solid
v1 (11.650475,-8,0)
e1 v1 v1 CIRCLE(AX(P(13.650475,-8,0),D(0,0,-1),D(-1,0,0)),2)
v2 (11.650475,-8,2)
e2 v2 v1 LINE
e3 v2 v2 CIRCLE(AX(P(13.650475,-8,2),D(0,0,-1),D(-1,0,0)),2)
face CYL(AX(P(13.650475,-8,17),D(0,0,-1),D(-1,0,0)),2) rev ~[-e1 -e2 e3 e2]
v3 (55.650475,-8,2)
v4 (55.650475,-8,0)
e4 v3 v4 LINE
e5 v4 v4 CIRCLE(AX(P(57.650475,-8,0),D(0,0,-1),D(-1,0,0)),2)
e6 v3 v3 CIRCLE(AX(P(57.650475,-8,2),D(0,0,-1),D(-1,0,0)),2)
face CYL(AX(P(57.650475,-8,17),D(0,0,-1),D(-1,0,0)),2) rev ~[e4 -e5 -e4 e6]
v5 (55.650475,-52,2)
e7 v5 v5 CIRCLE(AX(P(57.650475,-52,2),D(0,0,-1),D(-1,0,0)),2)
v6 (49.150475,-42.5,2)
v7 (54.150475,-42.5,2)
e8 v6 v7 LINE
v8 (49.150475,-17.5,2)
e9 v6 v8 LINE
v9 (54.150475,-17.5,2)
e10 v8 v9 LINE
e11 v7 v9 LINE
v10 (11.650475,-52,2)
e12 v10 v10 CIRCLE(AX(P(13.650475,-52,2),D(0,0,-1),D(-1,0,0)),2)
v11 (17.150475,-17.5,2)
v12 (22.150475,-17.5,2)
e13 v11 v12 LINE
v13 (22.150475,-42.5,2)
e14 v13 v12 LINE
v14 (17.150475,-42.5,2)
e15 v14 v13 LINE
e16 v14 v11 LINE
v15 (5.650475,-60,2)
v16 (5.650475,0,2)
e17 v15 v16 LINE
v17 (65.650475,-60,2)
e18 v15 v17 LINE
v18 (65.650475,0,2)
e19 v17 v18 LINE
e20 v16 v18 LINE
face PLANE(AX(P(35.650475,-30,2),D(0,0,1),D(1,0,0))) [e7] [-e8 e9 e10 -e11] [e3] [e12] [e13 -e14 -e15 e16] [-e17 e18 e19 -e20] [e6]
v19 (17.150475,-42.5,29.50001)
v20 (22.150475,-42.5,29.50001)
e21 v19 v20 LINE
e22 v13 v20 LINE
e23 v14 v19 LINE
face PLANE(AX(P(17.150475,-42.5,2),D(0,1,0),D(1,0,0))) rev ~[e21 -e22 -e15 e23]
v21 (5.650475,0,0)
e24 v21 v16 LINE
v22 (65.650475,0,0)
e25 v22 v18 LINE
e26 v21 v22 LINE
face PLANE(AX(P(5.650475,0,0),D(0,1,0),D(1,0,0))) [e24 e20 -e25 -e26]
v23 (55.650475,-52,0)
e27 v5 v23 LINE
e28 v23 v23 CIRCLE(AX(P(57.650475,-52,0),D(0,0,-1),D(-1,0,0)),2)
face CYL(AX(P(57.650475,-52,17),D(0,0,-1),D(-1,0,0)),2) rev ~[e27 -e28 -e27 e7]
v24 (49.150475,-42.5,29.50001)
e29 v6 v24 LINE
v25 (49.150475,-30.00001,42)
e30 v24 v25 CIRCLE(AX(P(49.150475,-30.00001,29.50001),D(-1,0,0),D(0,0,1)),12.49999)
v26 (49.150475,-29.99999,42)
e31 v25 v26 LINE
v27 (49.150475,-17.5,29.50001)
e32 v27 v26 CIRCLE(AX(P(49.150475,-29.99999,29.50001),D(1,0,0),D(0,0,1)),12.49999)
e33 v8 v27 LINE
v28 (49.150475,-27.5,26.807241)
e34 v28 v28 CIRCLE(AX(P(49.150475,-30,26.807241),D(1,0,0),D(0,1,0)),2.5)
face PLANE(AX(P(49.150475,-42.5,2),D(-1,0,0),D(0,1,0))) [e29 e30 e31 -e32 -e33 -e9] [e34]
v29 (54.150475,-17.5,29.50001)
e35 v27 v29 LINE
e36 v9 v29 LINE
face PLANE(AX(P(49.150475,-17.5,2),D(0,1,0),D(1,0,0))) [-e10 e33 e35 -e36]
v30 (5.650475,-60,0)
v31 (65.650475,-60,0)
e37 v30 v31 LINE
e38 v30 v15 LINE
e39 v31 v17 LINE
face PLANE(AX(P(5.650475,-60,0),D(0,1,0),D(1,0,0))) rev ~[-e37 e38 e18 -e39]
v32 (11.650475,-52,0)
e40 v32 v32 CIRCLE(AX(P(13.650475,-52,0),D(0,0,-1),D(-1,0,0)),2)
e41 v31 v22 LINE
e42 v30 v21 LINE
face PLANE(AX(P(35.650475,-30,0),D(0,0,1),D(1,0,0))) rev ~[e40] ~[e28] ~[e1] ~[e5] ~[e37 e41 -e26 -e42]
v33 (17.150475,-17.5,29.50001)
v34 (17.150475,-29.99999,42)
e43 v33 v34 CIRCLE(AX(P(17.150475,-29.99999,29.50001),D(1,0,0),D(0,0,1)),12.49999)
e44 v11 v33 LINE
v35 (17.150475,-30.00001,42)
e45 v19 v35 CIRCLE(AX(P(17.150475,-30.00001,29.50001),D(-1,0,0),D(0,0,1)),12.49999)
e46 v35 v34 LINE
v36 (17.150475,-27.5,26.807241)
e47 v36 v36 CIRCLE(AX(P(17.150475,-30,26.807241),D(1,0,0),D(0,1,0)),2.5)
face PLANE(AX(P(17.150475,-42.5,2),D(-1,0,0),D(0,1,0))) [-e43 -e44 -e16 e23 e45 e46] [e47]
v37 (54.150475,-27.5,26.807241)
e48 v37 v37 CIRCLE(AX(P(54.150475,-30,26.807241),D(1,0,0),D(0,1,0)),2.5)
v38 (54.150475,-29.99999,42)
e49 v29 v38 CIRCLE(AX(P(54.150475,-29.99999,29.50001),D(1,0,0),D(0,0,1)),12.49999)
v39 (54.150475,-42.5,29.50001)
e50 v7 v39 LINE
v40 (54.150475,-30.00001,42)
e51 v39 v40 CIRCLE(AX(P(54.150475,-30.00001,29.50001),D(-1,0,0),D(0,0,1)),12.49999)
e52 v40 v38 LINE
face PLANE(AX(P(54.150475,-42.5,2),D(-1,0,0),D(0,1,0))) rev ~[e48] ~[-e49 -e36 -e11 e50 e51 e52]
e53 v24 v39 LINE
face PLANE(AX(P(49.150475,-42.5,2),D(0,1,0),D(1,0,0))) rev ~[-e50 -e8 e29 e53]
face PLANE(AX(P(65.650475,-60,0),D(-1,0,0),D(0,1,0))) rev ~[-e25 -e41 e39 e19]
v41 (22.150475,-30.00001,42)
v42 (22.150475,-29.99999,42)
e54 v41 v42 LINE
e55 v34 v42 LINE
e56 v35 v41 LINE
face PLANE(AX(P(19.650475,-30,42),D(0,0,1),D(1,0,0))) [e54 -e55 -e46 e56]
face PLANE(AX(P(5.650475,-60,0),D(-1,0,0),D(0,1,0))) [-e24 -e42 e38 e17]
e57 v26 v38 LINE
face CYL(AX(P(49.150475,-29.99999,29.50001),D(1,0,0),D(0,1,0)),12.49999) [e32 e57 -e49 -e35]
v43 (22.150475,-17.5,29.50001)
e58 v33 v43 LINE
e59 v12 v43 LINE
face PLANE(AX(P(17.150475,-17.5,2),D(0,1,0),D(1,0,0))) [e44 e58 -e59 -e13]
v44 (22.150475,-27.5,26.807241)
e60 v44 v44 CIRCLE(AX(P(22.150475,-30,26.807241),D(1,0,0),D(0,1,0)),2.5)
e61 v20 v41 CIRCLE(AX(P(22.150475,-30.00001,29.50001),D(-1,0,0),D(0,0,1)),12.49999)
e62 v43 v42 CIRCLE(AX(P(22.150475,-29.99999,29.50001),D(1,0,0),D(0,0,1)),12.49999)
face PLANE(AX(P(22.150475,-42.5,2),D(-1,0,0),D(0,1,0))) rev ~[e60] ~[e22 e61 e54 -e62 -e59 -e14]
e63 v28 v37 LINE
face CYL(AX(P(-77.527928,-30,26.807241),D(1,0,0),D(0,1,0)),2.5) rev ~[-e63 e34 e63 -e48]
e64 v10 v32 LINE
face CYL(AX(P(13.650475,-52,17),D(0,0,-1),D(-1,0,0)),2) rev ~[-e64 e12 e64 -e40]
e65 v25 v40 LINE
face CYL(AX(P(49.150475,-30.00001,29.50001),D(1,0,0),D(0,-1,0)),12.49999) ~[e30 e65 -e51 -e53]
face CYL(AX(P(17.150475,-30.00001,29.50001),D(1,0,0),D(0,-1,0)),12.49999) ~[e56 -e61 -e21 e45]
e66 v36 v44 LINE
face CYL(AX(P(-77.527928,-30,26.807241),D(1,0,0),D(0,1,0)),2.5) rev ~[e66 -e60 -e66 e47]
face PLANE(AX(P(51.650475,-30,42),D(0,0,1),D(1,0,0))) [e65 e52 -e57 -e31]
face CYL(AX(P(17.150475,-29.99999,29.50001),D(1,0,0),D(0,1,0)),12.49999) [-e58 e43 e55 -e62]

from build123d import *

# Parameters (mm, degrees)
F0_W     = 60
F0_H     = 60
F1_DEPTH = 2
F2_W     = 5
F2_H     = 25
F3_DEPTH = 40
F4_DEPTH = 40
F5_R     = 12.49999
F7_D     = 5
F9_D     = 4
F9_DEPTH = 15
F9_TIP   = 1.2017212381


# Not quite as in the source:
# - a fillet or chamfer is up to 0.001 mm smaller than in the source, because OpenCascade refuses the exact size


with BuildPart() as f1:
    # F0 (on Top) → F1 (new body)
    with BuildSketch(Plane.XY):
        with Locations((35.6504749941, -30)):
            Rectangle(F0_W, F0_H)
    extrude(amount=F1_DEPTH)

    # F2 (on face) → F3 (join)
    with BuildSketch(Plane.XY.offset(2)):
        with Locations((19.6504749941, -30)):
            Rectangle(F2_W, F2_H)
    extrude(amount=F3_DEPTH)

    # F2 (on face) → F4 (join)
    with BuildSketch(Plane.XY.offset(2)):
        with Locations((51.6504749941, -30)):
            Rectangle(F2_W, F2_H)
    extrude(amount=F4_DEPTH)

    # F5 (radius 12.5 in the source; OpenCascade refuses exactly that, so slightly less here)
    f5_edges = [f1.edges().sort_by_distance(p)[0] for p in [
        (19.650475, -42.5, 42),
        (51.650475, -42.5, 42),
        (51.650475, -17.5, 42),
        (19.650475, -17.5, 42),
    ]]
    fillet(f5_edges, radius=F5_R)

    # F7 (through all)
    with Locations(Plane(origin=(17.1504749941, 0, 0), x_dir=(0, -1, 0), z_dir=(-1, 0, 0))):
        with Locations((30, 26.8072411418)):
            Hole(F7_D / 2)

    # F9
    with Locations(Plane.XY.offset(2)):
        with Locations((13.6504749941, -8), (13.6504749941, -52), (57.6504749941, -52), (57.6504749941, -8)):
            Hole(F9_D / 2, depth=F9_DEPTH)
            with Locations((0, 0, -(F9_DEPTH + F9_TIP / 2))):  # 118° drill point
                Cone(0, F9_D / 2, F9_TIP, mode=Mode.SUBTRACT)


solid = f1.part
